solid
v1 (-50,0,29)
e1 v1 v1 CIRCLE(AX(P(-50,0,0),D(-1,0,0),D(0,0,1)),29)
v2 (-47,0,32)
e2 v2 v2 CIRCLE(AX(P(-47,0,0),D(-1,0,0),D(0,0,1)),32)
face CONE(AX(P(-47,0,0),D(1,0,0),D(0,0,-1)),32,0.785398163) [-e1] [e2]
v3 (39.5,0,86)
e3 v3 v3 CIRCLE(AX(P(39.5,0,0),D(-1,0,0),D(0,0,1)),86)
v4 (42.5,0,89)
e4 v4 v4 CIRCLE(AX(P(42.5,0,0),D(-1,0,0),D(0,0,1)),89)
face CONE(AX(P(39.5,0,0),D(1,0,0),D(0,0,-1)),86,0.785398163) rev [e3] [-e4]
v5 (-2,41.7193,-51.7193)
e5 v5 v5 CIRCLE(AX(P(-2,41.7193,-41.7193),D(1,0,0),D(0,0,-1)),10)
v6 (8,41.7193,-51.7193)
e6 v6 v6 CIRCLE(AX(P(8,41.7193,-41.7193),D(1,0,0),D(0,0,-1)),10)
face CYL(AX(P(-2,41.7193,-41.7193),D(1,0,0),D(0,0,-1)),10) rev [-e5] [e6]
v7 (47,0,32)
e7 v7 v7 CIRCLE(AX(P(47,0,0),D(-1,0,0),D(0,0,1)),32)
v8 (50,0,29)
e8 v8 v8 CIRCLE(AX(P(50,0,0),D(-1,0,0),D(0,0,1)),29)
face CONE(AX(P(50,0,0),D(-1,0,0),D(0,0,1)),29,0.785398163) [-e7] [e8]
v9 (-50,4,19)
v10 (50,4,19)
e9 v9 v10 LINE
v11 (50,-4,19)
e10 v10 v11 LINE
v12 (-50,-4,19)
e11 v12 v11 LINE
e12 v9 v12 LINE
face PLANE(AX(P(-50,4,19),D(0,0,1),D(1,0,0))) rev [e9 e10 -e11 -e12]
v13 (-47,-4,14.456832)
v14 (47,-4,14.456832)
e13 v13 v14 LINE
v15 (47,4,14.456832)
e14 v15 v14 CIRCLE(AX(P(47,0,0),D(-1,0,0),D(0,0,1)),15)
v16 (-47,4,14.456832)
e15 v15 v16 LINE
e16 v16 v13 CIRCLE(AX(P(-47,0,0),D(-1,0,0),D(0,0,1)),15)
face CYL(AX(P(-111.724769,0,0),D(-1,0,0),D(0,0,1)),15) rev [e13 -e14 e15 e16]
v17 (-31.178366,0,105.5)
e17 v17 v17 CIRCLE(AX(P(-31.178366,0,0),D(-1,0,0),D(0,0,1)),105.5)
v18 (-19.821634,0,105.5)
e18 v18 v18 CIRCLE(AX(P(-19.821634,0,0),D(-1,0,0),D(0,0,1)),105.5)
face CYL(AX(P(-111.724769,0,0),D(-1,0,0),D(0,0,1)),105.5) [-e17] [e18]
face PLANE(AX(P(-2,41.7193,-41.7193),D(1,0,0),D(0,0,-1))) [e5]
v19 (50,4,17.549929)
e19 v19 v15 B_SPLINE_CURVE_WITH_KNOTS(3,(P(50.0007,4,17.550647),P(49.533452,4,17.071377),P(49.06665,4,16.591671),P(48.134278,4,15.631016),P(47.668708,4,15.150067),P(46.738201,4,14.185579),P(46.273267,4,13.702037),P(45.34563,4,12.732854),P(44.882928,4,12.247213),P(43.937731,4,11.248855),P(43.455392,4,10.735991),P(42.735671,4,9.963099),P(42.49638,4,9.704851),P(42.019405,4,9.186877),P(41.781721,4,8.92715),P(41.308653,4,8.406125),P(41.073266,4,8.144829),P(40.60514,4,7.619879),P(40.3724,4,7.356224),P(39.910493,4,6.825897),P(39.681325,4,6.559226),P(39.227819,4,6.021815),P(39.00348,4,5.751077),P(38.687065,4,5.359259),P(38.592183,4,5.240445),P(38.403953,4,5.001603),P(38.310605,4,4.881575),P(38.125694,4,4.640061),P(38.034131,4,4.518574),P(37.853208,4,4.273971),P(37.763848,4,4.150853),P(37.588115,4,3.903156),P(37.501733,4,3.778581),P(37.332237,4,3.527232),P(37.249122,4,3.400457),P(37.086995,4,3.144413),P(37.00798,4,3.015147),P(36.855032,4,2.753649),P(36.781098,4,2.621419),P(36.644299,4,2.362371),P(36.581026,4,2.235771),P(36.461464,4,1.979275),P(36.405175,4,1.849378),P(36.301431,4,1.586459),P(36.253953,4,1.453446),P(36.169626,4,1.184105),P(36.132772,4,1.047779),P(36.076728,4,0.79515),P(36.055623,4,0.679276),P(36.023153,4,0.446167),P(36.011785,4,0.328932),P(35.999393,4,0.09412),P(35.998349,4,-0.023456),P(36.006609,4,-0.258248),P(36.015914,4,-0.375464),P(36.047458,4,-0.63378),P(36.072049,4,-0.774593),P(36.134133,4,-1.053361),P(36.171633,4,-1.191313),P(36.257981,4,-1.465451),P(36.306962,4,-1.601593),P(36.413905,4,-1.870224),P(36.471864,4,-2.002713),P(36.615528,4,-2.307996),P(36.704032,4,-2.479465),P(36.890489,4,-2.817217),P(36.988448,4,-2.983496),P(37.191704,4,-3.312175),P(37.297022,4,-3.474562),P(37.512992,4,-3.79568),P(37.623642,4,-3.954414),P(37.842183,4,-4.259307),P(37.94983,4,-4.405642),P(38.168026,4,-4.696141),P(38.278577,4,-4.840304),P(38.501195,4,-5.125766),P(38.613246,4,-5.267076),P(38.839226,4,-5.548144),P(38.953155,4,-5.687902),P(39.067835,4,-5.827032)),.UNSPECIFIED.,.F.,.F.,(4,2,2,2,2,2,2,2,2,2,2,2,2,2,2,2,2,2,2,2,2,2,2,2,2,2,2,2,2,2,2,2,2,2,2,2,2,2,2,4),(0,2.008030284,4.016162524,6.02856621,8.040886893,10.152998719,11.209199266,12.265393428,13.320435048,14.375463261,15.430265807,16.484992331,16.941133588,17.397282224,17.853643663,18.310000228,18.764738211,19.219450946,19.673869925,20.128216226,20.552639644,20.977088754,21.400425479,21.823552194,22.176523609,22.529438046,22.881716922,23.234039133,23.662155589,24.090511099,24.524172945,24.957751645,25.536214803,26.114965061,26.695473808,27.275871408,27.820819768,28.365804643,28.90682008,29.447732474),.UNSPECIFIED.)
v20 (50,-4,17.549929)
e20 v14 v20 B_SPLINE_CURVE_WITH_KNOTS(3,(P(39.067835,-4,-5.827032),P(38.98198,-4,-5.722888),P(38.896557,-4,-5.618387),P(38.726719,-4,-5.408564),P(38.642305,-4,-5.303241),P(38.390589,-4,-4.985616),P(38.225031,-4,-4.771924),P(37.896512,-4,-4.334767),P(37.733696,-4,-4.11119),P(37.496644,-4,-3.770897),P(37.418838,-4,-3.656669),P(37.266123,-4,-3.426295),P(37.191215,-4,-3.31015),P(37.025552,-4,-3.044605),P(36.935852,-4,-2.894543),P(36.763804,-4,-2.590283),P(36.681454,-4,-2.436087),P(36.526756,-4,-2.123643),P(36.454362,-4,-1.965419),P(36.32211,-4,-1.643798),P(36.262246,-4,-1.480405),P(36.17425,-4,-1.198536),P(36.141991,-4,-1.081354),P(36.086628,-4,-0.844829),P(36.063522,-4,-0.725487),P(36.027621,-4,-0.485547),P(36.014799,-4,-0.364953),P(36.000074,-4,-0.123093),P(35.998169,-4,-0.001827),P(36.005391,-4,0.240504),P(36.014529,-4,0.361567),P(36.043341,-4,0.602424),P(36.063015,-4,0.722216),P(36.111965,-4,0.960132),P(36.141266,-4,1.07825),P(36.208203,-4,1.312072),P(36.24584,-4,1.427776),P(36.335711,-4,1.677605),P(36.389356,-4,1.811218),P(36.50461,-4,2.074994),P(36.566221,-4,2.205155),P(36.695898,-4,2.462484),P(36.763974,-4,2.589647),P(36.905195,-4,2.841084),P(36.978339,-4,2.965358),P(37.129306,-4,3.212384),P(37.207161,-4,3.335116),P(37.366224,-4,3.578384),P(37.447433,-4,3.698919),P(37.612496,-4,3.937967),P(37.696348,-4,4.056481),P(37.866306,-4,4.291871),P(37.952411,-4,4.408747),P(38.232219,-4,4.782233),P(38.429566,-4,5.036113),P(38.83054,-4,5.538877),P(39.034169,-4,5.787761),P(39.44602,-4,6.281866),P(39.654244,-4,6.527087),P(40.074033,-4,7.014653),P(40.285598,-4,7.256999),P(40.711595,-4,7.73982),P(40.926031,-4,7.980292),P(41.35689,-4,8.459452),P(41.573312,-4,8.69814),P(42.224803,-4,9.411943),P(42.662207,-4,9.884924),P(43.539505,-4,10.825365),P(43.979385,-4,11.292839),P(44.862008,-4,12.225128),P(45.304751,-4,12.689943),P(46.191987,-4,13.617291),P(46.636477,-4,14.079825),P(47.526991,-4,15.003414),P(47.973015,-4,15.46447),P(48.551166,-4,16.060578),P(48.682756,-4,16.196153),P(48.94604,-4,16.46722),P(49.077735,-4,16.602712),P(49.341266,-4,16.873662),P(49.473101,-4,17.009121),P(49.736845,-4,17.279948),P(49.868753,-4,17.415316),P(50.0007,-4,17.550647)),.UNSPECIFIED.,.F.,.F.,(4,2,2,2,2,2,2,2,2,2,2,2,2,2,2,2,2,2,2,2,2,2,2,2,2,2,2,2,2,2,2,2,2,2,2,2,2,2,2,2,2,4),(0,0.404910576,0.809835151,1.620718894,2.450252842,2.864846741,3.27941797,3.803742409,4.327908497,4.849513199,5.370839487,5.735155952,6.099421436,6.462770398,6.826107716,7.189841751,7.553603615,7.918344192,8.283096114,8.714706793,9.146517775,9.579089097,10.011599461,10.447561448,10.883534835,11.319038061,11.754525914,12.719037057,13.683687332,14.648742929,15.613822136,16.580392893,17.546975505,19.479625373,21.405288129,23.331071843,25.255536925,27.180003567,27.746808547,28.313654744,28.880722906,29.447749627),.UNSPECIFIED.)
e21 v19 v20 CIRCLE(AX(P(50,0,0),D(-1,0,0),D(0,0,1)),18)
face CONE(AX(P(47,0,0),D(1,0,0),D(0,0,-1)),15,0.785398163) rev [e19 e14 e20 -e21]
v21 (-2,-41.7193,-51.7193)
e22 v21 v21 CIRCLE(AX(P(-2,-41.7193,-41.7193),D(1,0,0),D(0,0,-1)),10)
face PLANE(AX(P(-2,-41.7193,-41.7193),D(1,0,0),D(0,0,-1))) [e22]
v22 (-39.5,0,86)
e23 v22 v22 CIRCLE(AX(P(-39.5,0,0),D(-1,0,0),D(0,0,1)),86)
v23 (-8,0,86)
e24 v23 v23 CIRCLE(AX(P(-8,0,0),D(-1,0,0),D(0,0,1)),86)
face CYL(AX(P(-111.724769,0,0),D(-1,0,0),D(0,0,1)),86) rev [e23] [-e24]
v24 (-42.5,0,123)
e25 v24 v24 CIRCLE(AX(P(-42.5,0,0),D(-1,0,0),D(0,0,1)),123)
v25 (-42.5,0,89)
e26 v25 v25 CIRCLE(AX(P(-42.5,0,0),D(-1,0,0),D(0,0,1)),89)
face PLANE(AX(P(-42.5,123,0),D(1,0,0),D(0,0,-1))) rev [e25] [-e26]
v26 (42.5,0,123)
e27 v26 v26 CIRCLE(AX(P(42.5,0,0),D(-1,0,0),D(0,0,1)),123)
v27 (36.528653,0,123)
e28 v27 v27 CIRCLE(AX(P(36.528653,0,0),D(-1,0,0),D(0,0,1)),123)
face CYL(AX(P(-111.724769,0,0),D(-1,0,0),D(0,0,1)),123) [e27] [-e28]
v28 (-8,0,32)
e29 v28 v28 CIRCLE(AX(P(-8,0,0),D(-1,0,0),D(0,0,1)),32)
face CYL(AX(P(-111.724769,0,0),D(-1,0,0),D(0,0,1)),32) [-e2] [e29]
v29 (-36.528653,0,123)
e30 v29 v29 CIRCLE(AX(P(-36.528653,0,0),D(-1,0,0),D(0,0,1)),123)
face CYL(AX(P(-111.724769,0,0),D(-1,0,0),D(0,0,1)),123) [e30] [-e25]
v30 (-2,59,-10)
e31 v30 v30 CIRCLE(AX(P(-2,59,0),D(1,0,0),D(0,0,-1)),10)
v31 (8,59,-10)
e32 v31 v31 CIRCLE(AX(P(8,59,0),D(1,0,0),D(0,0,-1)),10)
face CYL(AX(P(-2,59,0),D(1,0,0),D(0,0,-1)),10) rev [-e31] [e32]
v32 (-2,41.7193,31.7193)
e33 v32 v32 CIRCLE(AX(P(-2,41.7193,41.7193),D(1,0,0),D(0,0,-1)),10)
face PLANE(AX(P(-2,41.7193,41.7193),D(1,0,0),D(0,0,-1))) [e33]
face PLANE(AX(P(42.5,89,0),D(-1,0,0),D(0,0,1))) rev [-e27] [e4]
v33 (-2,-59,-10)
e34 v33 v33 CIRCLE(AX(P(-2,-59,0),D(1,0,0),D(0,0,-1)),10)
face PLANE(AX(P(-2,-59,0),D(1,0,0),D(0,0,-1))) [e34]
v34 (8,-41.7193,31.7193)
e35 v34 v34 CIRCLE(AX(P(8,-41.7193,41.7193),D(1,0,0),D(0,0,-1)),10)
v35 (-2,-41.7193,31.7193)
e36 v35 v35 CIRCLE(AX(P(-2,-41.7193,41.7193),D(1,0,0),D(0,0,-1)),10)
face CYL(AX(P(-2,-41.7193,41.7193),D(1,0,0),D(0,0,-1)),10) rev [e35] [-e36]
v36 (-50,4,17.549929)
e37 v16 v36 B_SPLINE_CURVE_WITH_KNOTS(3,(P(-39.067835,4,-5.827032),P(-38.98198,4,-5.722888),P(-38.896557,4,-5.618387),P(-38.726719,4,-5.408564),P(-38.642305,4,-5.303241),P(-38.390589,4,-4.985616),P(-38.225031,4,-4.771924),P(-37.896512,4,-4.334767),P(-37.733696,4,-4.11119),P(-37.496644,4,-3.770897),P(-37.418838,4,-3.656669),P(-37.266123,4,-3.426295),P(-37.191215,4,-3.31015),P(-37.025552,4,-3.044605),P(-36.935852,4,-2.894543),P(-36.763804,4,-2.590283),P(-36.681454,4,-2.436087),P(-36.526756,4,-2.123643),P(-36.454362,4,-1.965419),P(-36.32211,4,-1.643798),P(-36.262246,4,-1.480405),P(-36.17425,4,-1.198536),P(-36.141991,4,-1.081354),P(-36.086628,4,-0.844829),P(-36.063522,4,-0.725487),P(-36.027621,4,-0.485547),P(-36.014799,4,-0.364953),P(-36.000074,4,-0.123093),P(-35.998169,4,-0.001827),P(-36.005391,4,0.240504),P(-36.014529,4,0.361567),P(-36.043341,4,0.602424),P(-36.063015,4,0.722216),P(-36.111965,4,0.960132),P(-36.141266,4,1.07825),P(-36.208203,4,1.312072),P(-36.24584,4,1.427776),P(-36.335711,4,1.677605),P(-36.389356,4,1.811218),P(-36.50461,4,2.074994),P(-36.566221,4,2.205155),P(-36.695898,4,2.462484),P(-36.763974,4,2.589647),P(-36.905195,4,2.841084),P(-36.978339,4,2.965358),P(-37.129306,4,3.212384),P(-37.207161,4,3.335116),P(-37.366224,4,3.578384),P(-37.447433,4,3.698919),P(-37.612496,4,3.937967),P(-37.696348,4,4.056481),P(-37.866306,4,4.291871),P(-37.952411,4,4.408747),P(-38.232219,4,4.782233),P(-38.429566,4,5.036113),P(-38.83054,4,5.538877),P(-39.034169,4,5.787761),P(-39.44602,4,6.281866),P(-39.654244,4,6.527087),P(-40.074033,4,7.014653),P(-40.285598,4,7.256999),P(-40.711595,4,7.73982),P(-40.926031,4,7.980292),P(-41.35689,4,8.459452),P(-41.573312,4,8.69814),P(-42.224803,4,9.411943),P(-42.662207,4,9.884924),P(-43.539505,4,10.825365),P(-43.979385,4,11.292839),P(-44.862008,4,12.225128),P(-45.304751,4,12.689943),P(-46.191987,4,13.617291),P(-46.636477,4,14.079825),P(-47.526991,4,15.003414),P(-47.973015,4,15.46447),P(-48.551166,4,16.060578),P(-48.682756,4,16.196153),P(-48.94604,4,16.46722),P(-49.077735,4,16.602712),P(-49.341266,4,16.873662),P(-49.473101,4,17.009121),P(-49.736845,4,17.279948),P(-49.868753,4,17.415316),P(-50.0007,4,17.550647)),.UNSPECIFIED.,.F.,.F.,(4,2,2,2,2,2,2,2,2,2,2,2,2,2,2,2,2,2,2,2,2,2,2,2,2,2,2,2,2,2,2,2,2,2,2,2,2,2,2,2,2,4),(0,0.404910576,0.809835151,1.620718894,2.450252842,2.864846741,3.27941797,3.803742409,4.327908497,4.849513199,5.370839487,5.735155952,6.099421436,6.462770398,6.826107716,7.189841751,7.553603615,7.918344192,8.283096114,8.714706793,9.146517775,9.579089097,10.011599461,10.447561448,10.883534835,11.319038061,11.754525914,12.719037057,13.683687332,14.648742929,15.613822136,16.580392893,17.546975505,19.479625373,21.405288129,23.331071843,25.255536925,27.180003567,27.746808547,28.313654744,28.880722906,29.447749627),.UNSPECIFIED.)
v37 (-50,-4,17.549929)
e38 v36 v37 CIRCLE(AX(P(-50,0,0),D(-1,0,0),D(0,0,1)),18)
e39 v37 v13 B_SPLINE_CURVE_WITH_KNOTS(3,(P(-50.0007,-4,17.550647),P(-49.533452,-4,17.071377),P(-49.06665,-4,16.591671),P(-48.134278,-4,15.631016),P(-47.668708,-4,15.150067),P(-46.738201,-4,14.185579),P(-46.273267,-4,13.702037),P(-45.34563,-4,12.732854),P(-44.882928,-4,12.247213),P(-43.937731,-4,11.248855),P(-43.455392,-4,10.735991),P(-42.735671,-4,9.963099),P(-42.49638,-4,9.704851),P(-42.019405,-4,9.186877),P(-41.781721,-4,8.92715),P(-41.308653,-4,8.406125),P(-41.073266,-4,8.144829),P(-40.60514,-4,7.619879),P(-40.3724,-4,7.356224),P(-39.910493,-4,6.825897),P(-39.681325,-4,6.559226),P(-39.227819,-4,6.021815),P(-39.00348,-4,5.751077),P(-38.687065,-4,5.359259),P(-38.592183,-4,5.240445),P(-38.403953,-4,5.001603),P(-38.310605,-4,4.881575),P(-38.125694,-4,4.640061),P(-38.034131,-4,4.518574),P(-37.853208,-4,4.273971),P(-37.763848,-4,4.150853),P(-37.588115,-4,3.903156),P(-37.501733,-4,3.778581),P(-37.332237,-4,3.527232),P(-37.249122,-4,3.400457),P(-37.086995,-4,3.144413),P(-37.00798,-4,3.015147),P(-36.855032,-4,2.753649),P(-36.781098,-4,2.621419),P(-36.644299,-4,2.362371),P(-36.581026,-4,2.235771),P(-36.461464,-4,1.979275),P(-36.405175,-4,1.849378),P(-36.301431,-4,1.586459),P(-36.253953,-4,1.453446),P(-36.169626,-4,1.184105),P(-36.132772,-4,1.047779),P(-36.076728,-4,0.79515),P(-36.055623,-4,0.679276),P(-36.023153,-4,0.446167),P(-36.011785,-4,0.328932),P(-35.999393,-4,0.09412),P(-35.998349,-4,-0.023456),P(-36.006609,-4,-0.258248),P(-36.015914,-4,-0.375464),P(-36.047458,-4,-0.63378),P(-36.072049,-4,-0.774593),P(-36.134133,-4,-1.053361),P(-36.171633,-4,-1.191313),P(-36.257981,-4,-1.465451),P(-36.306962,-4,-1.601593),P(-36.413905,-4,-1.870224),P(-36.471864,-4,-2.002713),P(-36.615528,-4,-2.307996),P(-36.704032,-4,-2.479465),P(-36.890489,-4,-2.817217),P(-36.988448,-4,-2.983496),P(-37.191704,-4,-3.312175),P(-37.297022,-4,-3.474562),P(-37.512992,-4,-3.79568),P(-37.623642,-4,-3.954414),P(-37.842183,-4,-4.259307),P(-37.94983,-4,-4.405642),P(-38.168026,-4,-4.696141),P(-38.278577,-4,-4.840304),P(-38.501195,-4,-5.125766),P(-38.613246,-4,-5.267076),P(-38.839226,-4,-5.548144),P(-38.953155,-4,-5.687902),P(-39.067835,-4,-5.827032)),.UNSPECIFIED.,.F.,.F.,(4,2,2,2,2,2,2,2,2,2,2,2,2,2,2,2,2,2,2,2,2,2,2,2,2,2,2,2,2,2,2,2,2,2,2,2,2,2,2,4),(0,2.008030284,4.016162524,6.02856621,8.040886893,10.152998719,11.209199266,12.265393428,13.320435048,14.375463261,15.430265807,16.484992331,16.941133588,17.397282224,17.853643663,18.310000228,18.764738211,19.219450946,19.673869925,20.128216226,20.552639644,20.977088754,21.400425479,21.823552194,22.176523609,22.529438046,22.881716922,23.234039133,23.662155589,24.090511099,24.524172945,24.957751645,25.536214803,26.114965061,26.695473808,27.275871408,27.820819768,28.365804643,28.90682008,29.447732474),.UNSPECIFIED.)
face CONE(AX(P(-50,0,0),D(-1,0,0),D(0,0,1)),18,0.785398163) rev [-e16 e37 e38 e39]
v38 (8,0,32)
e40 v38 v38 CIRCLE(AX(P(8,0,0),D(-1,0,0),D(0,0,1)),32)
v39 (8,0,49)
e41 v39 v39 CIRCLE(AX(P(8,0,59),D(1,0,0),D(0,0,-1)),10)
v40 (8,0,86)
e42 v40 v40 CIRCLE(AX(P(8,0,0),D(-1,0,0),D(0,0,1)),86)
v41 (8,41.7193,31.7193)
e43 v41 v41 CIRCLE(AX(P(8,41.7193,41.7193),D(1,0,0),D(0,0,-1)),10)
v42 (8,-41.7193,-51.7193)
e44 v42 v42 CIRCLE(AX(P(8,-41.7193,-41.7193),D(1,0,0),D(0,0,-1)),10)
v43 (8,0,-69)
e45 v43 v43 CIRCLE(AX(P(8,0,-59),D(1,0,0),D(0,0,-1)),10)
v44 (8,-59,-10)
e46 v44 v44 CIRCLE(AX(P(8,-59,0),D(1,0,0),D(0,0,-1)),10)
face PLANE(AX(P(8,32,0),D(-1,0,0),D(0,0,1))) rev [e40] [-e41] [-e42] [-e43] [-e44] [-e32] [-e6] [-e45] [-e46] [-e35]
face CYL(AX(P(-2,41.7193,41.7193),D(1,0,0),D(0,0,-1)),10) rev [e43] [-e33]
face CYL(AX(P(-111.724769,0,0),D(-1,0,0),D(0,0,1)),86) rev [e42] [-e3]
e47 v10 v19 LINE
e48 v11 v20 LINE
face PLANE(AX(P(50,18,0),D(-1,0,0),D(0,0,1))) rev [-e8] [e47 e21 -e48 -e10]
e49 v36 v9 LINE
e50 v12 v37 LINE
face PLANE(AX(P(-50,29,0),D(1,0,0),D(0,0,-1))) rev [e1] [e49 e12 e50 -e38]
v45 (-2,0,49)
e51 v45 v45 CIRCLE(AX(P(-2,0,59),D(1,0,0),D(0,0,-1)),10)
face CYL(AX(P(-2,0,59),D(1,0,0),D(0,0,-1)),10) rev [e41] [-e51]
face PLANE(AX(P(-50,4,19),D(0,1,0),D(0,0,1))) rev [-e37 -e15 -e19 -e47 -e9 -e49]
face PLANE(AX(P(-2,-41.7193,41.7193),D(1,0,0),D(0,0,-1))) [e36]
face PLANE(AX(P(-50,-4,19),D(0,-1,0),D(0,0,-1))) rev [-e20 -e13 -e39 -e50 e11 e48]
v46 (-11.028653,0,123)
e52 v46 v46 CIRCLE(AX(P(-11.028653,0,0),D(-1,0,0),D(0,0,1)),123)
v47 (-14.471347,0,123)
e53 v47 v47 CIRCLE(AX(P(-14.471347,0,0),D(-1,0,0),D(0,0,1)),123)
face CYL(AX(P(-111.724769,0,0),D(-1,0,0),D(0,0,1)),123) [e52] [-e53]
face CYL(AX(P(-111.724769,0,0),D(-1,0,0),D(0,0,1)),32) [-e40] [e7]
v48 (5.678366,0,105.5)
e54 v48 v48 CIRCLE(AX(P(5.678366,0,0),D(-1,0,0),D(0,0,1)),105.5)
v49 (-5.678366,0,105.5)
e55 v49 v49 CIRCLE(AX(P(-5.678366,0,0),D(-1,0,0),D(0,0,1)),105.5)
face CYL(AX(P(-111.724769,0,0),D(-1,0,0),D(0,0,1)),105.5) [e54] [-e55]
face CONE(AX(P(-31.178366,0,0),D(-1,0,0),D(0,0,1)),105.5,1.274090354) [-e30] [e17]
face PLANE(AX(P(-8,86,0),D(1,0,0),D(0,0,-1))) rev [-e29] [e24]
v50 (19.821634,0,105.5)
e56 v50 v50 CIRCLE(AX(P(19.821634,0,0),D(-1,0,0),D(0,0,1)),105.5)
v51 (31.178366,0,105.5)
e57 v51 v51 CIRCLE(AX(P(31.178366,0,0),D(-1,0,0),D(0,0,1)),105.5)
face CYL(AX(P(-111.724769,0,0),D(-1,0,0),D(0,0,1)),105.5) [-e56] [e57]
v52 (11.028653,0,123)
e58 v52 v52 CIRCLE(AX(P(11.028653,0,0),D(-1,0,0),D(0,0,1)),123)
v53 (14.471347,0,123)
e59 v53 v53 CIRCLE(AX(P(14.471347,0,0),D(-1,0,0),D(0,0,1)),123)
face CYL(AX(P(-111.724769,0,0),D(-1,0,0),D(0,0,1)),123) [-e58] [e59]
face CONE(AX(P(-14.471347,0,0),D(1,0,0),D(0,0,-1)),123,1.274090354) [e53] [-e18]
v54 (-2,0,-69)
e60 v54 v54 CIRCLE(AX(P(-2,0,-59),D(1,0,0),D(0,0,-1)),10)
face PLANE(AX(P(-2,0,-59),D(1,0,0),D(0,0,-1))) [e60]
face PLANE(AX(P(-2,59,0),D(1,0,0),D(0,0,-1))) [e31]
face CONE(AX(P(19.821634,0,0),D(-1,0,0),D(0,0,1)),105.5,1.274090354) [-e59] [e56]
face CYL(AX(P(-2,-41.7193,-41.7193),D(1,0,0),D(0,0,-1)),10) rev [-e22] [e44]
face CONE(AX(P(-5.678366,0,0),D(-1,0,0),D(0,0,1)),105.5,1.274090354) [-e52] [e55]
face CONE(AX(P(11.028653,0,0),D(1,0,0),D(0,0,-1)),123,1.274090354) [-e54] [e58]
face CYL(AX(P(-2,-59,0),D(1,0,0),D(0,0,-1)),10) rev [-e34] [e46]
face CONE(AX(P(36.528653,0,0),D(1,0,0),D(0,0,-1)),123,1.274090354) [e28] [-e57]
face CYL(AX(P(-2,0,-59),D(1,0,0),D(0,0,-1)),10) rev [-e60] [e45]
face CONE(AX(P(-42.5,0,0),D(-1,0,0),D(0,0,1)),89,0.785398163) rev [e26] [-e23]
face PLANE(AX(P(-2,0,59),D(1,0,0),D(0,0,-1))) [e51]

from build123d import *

# Parameters (mm, degrees)
OTHER_START              = -2
OTHER_1_OUTLINE_R        = 10
OTHER_1_DEPTH            = 10
CUT_EXTRUDE_1_DEPTH      = 181.991712517
CUT_EXTRUDE_1_DEPTH_BACK = 181.991712517
SKETCH_4_W               = 24.82633163
SKETCH_4_H               = 8


# Read off the part's stored shape, not the designer's step: 孔1
with BuildPart() as part:
    # 草图1 → 旋转9 (revolve)
    with BuildSketch(Plane.XY, mode=Mode.PRIVATE) as revolve_9_sk:
        Polygon((-47, 15), (47, 15), (50, 18), (50, 29), (47, 32), (8, 32), (8, 86), (39.5, 86), (42.5, 89), (42.5, 123), (36.528653407, 123), (31.178366482, 105.5), (19.821633518, 105.5), (14.471346593, 123), (11.028653407, 123), (5.678366482, 105.5), (-5.678366482, 105.5), (-11.028653407, 123), (-14.471346593, 123), (-19.821633518, 105.5), (-31.178366482, 105.5), (-36.528653407, 123), (-42.5, 123), (-42.5, 89), (-39.5, 86), (-8, 86), (-8, 32), (-47, 32), (-50, 29), (-50, 18), align=None)
    revolve(revolve_9_sk.sketch.rotate(Axis((-111.724769182, 0, 0), (1, 0, 0)), 90), axis=Axis((-111.724769182, 0, 0), (1, 0, 0)))

    # 孔1 outline → 孔1 (cut)
    with BuildSketch(Plane.YZ.offset(OTHER_START)):
        with Locations((0, -59)):
            Circle(OTHER_1_OUTLINE_R)
        with Locations((-41.71930009, -41.71930009)):
            Circle(OTHER_1_OUTLINE_R)
        with Locations((-59, 0)):
            Circle(OTHER_1_OUTLINE_R)
        with Locations((-41.71930009, 41.71930009)):
            Circle(OTHER_1_OUTLINE_R)
        with Locations((0, 59)):
            Circle(OTHER_1_OUTLINE_R)
        with Locations((41.71930009, 41.71930009)):
            Circle(OTHER_1_OUTLINE_R)
        with Locations((59, 0)):
            Circle(OTHER_1_OUTLINE_R)
        with Locations((41.71930009, -41.71930009)):
            Circle(OTHER_1_OUTLINE_R)
    extrude(amount=OTHER_1_DEPTH, mode=Mode.SUBTRACT)

    # 草图4 → 切除-拉伸1 (cut, two sides: drawn at the far end of the back side and taken through both)
    with BuildSketch(Plane(origin=(0, 0, 0), x_dir=(0, 0, -1), z_dir=(1, 0, 0)).offset(-CUT_EXTRUDE_1_DEPTH_BACK)):
        with Locations((-6.586834185, 0)):
            Rectangle(SKETCH_4_W, SKETCH_4_H)
    extrude(amount=CUT_EXTRUDE_1_DEPTH + CUT_EXTRUDE_1_DEPTH_BACK, mode=Mode.SUBTRACT)


solid = part.part
